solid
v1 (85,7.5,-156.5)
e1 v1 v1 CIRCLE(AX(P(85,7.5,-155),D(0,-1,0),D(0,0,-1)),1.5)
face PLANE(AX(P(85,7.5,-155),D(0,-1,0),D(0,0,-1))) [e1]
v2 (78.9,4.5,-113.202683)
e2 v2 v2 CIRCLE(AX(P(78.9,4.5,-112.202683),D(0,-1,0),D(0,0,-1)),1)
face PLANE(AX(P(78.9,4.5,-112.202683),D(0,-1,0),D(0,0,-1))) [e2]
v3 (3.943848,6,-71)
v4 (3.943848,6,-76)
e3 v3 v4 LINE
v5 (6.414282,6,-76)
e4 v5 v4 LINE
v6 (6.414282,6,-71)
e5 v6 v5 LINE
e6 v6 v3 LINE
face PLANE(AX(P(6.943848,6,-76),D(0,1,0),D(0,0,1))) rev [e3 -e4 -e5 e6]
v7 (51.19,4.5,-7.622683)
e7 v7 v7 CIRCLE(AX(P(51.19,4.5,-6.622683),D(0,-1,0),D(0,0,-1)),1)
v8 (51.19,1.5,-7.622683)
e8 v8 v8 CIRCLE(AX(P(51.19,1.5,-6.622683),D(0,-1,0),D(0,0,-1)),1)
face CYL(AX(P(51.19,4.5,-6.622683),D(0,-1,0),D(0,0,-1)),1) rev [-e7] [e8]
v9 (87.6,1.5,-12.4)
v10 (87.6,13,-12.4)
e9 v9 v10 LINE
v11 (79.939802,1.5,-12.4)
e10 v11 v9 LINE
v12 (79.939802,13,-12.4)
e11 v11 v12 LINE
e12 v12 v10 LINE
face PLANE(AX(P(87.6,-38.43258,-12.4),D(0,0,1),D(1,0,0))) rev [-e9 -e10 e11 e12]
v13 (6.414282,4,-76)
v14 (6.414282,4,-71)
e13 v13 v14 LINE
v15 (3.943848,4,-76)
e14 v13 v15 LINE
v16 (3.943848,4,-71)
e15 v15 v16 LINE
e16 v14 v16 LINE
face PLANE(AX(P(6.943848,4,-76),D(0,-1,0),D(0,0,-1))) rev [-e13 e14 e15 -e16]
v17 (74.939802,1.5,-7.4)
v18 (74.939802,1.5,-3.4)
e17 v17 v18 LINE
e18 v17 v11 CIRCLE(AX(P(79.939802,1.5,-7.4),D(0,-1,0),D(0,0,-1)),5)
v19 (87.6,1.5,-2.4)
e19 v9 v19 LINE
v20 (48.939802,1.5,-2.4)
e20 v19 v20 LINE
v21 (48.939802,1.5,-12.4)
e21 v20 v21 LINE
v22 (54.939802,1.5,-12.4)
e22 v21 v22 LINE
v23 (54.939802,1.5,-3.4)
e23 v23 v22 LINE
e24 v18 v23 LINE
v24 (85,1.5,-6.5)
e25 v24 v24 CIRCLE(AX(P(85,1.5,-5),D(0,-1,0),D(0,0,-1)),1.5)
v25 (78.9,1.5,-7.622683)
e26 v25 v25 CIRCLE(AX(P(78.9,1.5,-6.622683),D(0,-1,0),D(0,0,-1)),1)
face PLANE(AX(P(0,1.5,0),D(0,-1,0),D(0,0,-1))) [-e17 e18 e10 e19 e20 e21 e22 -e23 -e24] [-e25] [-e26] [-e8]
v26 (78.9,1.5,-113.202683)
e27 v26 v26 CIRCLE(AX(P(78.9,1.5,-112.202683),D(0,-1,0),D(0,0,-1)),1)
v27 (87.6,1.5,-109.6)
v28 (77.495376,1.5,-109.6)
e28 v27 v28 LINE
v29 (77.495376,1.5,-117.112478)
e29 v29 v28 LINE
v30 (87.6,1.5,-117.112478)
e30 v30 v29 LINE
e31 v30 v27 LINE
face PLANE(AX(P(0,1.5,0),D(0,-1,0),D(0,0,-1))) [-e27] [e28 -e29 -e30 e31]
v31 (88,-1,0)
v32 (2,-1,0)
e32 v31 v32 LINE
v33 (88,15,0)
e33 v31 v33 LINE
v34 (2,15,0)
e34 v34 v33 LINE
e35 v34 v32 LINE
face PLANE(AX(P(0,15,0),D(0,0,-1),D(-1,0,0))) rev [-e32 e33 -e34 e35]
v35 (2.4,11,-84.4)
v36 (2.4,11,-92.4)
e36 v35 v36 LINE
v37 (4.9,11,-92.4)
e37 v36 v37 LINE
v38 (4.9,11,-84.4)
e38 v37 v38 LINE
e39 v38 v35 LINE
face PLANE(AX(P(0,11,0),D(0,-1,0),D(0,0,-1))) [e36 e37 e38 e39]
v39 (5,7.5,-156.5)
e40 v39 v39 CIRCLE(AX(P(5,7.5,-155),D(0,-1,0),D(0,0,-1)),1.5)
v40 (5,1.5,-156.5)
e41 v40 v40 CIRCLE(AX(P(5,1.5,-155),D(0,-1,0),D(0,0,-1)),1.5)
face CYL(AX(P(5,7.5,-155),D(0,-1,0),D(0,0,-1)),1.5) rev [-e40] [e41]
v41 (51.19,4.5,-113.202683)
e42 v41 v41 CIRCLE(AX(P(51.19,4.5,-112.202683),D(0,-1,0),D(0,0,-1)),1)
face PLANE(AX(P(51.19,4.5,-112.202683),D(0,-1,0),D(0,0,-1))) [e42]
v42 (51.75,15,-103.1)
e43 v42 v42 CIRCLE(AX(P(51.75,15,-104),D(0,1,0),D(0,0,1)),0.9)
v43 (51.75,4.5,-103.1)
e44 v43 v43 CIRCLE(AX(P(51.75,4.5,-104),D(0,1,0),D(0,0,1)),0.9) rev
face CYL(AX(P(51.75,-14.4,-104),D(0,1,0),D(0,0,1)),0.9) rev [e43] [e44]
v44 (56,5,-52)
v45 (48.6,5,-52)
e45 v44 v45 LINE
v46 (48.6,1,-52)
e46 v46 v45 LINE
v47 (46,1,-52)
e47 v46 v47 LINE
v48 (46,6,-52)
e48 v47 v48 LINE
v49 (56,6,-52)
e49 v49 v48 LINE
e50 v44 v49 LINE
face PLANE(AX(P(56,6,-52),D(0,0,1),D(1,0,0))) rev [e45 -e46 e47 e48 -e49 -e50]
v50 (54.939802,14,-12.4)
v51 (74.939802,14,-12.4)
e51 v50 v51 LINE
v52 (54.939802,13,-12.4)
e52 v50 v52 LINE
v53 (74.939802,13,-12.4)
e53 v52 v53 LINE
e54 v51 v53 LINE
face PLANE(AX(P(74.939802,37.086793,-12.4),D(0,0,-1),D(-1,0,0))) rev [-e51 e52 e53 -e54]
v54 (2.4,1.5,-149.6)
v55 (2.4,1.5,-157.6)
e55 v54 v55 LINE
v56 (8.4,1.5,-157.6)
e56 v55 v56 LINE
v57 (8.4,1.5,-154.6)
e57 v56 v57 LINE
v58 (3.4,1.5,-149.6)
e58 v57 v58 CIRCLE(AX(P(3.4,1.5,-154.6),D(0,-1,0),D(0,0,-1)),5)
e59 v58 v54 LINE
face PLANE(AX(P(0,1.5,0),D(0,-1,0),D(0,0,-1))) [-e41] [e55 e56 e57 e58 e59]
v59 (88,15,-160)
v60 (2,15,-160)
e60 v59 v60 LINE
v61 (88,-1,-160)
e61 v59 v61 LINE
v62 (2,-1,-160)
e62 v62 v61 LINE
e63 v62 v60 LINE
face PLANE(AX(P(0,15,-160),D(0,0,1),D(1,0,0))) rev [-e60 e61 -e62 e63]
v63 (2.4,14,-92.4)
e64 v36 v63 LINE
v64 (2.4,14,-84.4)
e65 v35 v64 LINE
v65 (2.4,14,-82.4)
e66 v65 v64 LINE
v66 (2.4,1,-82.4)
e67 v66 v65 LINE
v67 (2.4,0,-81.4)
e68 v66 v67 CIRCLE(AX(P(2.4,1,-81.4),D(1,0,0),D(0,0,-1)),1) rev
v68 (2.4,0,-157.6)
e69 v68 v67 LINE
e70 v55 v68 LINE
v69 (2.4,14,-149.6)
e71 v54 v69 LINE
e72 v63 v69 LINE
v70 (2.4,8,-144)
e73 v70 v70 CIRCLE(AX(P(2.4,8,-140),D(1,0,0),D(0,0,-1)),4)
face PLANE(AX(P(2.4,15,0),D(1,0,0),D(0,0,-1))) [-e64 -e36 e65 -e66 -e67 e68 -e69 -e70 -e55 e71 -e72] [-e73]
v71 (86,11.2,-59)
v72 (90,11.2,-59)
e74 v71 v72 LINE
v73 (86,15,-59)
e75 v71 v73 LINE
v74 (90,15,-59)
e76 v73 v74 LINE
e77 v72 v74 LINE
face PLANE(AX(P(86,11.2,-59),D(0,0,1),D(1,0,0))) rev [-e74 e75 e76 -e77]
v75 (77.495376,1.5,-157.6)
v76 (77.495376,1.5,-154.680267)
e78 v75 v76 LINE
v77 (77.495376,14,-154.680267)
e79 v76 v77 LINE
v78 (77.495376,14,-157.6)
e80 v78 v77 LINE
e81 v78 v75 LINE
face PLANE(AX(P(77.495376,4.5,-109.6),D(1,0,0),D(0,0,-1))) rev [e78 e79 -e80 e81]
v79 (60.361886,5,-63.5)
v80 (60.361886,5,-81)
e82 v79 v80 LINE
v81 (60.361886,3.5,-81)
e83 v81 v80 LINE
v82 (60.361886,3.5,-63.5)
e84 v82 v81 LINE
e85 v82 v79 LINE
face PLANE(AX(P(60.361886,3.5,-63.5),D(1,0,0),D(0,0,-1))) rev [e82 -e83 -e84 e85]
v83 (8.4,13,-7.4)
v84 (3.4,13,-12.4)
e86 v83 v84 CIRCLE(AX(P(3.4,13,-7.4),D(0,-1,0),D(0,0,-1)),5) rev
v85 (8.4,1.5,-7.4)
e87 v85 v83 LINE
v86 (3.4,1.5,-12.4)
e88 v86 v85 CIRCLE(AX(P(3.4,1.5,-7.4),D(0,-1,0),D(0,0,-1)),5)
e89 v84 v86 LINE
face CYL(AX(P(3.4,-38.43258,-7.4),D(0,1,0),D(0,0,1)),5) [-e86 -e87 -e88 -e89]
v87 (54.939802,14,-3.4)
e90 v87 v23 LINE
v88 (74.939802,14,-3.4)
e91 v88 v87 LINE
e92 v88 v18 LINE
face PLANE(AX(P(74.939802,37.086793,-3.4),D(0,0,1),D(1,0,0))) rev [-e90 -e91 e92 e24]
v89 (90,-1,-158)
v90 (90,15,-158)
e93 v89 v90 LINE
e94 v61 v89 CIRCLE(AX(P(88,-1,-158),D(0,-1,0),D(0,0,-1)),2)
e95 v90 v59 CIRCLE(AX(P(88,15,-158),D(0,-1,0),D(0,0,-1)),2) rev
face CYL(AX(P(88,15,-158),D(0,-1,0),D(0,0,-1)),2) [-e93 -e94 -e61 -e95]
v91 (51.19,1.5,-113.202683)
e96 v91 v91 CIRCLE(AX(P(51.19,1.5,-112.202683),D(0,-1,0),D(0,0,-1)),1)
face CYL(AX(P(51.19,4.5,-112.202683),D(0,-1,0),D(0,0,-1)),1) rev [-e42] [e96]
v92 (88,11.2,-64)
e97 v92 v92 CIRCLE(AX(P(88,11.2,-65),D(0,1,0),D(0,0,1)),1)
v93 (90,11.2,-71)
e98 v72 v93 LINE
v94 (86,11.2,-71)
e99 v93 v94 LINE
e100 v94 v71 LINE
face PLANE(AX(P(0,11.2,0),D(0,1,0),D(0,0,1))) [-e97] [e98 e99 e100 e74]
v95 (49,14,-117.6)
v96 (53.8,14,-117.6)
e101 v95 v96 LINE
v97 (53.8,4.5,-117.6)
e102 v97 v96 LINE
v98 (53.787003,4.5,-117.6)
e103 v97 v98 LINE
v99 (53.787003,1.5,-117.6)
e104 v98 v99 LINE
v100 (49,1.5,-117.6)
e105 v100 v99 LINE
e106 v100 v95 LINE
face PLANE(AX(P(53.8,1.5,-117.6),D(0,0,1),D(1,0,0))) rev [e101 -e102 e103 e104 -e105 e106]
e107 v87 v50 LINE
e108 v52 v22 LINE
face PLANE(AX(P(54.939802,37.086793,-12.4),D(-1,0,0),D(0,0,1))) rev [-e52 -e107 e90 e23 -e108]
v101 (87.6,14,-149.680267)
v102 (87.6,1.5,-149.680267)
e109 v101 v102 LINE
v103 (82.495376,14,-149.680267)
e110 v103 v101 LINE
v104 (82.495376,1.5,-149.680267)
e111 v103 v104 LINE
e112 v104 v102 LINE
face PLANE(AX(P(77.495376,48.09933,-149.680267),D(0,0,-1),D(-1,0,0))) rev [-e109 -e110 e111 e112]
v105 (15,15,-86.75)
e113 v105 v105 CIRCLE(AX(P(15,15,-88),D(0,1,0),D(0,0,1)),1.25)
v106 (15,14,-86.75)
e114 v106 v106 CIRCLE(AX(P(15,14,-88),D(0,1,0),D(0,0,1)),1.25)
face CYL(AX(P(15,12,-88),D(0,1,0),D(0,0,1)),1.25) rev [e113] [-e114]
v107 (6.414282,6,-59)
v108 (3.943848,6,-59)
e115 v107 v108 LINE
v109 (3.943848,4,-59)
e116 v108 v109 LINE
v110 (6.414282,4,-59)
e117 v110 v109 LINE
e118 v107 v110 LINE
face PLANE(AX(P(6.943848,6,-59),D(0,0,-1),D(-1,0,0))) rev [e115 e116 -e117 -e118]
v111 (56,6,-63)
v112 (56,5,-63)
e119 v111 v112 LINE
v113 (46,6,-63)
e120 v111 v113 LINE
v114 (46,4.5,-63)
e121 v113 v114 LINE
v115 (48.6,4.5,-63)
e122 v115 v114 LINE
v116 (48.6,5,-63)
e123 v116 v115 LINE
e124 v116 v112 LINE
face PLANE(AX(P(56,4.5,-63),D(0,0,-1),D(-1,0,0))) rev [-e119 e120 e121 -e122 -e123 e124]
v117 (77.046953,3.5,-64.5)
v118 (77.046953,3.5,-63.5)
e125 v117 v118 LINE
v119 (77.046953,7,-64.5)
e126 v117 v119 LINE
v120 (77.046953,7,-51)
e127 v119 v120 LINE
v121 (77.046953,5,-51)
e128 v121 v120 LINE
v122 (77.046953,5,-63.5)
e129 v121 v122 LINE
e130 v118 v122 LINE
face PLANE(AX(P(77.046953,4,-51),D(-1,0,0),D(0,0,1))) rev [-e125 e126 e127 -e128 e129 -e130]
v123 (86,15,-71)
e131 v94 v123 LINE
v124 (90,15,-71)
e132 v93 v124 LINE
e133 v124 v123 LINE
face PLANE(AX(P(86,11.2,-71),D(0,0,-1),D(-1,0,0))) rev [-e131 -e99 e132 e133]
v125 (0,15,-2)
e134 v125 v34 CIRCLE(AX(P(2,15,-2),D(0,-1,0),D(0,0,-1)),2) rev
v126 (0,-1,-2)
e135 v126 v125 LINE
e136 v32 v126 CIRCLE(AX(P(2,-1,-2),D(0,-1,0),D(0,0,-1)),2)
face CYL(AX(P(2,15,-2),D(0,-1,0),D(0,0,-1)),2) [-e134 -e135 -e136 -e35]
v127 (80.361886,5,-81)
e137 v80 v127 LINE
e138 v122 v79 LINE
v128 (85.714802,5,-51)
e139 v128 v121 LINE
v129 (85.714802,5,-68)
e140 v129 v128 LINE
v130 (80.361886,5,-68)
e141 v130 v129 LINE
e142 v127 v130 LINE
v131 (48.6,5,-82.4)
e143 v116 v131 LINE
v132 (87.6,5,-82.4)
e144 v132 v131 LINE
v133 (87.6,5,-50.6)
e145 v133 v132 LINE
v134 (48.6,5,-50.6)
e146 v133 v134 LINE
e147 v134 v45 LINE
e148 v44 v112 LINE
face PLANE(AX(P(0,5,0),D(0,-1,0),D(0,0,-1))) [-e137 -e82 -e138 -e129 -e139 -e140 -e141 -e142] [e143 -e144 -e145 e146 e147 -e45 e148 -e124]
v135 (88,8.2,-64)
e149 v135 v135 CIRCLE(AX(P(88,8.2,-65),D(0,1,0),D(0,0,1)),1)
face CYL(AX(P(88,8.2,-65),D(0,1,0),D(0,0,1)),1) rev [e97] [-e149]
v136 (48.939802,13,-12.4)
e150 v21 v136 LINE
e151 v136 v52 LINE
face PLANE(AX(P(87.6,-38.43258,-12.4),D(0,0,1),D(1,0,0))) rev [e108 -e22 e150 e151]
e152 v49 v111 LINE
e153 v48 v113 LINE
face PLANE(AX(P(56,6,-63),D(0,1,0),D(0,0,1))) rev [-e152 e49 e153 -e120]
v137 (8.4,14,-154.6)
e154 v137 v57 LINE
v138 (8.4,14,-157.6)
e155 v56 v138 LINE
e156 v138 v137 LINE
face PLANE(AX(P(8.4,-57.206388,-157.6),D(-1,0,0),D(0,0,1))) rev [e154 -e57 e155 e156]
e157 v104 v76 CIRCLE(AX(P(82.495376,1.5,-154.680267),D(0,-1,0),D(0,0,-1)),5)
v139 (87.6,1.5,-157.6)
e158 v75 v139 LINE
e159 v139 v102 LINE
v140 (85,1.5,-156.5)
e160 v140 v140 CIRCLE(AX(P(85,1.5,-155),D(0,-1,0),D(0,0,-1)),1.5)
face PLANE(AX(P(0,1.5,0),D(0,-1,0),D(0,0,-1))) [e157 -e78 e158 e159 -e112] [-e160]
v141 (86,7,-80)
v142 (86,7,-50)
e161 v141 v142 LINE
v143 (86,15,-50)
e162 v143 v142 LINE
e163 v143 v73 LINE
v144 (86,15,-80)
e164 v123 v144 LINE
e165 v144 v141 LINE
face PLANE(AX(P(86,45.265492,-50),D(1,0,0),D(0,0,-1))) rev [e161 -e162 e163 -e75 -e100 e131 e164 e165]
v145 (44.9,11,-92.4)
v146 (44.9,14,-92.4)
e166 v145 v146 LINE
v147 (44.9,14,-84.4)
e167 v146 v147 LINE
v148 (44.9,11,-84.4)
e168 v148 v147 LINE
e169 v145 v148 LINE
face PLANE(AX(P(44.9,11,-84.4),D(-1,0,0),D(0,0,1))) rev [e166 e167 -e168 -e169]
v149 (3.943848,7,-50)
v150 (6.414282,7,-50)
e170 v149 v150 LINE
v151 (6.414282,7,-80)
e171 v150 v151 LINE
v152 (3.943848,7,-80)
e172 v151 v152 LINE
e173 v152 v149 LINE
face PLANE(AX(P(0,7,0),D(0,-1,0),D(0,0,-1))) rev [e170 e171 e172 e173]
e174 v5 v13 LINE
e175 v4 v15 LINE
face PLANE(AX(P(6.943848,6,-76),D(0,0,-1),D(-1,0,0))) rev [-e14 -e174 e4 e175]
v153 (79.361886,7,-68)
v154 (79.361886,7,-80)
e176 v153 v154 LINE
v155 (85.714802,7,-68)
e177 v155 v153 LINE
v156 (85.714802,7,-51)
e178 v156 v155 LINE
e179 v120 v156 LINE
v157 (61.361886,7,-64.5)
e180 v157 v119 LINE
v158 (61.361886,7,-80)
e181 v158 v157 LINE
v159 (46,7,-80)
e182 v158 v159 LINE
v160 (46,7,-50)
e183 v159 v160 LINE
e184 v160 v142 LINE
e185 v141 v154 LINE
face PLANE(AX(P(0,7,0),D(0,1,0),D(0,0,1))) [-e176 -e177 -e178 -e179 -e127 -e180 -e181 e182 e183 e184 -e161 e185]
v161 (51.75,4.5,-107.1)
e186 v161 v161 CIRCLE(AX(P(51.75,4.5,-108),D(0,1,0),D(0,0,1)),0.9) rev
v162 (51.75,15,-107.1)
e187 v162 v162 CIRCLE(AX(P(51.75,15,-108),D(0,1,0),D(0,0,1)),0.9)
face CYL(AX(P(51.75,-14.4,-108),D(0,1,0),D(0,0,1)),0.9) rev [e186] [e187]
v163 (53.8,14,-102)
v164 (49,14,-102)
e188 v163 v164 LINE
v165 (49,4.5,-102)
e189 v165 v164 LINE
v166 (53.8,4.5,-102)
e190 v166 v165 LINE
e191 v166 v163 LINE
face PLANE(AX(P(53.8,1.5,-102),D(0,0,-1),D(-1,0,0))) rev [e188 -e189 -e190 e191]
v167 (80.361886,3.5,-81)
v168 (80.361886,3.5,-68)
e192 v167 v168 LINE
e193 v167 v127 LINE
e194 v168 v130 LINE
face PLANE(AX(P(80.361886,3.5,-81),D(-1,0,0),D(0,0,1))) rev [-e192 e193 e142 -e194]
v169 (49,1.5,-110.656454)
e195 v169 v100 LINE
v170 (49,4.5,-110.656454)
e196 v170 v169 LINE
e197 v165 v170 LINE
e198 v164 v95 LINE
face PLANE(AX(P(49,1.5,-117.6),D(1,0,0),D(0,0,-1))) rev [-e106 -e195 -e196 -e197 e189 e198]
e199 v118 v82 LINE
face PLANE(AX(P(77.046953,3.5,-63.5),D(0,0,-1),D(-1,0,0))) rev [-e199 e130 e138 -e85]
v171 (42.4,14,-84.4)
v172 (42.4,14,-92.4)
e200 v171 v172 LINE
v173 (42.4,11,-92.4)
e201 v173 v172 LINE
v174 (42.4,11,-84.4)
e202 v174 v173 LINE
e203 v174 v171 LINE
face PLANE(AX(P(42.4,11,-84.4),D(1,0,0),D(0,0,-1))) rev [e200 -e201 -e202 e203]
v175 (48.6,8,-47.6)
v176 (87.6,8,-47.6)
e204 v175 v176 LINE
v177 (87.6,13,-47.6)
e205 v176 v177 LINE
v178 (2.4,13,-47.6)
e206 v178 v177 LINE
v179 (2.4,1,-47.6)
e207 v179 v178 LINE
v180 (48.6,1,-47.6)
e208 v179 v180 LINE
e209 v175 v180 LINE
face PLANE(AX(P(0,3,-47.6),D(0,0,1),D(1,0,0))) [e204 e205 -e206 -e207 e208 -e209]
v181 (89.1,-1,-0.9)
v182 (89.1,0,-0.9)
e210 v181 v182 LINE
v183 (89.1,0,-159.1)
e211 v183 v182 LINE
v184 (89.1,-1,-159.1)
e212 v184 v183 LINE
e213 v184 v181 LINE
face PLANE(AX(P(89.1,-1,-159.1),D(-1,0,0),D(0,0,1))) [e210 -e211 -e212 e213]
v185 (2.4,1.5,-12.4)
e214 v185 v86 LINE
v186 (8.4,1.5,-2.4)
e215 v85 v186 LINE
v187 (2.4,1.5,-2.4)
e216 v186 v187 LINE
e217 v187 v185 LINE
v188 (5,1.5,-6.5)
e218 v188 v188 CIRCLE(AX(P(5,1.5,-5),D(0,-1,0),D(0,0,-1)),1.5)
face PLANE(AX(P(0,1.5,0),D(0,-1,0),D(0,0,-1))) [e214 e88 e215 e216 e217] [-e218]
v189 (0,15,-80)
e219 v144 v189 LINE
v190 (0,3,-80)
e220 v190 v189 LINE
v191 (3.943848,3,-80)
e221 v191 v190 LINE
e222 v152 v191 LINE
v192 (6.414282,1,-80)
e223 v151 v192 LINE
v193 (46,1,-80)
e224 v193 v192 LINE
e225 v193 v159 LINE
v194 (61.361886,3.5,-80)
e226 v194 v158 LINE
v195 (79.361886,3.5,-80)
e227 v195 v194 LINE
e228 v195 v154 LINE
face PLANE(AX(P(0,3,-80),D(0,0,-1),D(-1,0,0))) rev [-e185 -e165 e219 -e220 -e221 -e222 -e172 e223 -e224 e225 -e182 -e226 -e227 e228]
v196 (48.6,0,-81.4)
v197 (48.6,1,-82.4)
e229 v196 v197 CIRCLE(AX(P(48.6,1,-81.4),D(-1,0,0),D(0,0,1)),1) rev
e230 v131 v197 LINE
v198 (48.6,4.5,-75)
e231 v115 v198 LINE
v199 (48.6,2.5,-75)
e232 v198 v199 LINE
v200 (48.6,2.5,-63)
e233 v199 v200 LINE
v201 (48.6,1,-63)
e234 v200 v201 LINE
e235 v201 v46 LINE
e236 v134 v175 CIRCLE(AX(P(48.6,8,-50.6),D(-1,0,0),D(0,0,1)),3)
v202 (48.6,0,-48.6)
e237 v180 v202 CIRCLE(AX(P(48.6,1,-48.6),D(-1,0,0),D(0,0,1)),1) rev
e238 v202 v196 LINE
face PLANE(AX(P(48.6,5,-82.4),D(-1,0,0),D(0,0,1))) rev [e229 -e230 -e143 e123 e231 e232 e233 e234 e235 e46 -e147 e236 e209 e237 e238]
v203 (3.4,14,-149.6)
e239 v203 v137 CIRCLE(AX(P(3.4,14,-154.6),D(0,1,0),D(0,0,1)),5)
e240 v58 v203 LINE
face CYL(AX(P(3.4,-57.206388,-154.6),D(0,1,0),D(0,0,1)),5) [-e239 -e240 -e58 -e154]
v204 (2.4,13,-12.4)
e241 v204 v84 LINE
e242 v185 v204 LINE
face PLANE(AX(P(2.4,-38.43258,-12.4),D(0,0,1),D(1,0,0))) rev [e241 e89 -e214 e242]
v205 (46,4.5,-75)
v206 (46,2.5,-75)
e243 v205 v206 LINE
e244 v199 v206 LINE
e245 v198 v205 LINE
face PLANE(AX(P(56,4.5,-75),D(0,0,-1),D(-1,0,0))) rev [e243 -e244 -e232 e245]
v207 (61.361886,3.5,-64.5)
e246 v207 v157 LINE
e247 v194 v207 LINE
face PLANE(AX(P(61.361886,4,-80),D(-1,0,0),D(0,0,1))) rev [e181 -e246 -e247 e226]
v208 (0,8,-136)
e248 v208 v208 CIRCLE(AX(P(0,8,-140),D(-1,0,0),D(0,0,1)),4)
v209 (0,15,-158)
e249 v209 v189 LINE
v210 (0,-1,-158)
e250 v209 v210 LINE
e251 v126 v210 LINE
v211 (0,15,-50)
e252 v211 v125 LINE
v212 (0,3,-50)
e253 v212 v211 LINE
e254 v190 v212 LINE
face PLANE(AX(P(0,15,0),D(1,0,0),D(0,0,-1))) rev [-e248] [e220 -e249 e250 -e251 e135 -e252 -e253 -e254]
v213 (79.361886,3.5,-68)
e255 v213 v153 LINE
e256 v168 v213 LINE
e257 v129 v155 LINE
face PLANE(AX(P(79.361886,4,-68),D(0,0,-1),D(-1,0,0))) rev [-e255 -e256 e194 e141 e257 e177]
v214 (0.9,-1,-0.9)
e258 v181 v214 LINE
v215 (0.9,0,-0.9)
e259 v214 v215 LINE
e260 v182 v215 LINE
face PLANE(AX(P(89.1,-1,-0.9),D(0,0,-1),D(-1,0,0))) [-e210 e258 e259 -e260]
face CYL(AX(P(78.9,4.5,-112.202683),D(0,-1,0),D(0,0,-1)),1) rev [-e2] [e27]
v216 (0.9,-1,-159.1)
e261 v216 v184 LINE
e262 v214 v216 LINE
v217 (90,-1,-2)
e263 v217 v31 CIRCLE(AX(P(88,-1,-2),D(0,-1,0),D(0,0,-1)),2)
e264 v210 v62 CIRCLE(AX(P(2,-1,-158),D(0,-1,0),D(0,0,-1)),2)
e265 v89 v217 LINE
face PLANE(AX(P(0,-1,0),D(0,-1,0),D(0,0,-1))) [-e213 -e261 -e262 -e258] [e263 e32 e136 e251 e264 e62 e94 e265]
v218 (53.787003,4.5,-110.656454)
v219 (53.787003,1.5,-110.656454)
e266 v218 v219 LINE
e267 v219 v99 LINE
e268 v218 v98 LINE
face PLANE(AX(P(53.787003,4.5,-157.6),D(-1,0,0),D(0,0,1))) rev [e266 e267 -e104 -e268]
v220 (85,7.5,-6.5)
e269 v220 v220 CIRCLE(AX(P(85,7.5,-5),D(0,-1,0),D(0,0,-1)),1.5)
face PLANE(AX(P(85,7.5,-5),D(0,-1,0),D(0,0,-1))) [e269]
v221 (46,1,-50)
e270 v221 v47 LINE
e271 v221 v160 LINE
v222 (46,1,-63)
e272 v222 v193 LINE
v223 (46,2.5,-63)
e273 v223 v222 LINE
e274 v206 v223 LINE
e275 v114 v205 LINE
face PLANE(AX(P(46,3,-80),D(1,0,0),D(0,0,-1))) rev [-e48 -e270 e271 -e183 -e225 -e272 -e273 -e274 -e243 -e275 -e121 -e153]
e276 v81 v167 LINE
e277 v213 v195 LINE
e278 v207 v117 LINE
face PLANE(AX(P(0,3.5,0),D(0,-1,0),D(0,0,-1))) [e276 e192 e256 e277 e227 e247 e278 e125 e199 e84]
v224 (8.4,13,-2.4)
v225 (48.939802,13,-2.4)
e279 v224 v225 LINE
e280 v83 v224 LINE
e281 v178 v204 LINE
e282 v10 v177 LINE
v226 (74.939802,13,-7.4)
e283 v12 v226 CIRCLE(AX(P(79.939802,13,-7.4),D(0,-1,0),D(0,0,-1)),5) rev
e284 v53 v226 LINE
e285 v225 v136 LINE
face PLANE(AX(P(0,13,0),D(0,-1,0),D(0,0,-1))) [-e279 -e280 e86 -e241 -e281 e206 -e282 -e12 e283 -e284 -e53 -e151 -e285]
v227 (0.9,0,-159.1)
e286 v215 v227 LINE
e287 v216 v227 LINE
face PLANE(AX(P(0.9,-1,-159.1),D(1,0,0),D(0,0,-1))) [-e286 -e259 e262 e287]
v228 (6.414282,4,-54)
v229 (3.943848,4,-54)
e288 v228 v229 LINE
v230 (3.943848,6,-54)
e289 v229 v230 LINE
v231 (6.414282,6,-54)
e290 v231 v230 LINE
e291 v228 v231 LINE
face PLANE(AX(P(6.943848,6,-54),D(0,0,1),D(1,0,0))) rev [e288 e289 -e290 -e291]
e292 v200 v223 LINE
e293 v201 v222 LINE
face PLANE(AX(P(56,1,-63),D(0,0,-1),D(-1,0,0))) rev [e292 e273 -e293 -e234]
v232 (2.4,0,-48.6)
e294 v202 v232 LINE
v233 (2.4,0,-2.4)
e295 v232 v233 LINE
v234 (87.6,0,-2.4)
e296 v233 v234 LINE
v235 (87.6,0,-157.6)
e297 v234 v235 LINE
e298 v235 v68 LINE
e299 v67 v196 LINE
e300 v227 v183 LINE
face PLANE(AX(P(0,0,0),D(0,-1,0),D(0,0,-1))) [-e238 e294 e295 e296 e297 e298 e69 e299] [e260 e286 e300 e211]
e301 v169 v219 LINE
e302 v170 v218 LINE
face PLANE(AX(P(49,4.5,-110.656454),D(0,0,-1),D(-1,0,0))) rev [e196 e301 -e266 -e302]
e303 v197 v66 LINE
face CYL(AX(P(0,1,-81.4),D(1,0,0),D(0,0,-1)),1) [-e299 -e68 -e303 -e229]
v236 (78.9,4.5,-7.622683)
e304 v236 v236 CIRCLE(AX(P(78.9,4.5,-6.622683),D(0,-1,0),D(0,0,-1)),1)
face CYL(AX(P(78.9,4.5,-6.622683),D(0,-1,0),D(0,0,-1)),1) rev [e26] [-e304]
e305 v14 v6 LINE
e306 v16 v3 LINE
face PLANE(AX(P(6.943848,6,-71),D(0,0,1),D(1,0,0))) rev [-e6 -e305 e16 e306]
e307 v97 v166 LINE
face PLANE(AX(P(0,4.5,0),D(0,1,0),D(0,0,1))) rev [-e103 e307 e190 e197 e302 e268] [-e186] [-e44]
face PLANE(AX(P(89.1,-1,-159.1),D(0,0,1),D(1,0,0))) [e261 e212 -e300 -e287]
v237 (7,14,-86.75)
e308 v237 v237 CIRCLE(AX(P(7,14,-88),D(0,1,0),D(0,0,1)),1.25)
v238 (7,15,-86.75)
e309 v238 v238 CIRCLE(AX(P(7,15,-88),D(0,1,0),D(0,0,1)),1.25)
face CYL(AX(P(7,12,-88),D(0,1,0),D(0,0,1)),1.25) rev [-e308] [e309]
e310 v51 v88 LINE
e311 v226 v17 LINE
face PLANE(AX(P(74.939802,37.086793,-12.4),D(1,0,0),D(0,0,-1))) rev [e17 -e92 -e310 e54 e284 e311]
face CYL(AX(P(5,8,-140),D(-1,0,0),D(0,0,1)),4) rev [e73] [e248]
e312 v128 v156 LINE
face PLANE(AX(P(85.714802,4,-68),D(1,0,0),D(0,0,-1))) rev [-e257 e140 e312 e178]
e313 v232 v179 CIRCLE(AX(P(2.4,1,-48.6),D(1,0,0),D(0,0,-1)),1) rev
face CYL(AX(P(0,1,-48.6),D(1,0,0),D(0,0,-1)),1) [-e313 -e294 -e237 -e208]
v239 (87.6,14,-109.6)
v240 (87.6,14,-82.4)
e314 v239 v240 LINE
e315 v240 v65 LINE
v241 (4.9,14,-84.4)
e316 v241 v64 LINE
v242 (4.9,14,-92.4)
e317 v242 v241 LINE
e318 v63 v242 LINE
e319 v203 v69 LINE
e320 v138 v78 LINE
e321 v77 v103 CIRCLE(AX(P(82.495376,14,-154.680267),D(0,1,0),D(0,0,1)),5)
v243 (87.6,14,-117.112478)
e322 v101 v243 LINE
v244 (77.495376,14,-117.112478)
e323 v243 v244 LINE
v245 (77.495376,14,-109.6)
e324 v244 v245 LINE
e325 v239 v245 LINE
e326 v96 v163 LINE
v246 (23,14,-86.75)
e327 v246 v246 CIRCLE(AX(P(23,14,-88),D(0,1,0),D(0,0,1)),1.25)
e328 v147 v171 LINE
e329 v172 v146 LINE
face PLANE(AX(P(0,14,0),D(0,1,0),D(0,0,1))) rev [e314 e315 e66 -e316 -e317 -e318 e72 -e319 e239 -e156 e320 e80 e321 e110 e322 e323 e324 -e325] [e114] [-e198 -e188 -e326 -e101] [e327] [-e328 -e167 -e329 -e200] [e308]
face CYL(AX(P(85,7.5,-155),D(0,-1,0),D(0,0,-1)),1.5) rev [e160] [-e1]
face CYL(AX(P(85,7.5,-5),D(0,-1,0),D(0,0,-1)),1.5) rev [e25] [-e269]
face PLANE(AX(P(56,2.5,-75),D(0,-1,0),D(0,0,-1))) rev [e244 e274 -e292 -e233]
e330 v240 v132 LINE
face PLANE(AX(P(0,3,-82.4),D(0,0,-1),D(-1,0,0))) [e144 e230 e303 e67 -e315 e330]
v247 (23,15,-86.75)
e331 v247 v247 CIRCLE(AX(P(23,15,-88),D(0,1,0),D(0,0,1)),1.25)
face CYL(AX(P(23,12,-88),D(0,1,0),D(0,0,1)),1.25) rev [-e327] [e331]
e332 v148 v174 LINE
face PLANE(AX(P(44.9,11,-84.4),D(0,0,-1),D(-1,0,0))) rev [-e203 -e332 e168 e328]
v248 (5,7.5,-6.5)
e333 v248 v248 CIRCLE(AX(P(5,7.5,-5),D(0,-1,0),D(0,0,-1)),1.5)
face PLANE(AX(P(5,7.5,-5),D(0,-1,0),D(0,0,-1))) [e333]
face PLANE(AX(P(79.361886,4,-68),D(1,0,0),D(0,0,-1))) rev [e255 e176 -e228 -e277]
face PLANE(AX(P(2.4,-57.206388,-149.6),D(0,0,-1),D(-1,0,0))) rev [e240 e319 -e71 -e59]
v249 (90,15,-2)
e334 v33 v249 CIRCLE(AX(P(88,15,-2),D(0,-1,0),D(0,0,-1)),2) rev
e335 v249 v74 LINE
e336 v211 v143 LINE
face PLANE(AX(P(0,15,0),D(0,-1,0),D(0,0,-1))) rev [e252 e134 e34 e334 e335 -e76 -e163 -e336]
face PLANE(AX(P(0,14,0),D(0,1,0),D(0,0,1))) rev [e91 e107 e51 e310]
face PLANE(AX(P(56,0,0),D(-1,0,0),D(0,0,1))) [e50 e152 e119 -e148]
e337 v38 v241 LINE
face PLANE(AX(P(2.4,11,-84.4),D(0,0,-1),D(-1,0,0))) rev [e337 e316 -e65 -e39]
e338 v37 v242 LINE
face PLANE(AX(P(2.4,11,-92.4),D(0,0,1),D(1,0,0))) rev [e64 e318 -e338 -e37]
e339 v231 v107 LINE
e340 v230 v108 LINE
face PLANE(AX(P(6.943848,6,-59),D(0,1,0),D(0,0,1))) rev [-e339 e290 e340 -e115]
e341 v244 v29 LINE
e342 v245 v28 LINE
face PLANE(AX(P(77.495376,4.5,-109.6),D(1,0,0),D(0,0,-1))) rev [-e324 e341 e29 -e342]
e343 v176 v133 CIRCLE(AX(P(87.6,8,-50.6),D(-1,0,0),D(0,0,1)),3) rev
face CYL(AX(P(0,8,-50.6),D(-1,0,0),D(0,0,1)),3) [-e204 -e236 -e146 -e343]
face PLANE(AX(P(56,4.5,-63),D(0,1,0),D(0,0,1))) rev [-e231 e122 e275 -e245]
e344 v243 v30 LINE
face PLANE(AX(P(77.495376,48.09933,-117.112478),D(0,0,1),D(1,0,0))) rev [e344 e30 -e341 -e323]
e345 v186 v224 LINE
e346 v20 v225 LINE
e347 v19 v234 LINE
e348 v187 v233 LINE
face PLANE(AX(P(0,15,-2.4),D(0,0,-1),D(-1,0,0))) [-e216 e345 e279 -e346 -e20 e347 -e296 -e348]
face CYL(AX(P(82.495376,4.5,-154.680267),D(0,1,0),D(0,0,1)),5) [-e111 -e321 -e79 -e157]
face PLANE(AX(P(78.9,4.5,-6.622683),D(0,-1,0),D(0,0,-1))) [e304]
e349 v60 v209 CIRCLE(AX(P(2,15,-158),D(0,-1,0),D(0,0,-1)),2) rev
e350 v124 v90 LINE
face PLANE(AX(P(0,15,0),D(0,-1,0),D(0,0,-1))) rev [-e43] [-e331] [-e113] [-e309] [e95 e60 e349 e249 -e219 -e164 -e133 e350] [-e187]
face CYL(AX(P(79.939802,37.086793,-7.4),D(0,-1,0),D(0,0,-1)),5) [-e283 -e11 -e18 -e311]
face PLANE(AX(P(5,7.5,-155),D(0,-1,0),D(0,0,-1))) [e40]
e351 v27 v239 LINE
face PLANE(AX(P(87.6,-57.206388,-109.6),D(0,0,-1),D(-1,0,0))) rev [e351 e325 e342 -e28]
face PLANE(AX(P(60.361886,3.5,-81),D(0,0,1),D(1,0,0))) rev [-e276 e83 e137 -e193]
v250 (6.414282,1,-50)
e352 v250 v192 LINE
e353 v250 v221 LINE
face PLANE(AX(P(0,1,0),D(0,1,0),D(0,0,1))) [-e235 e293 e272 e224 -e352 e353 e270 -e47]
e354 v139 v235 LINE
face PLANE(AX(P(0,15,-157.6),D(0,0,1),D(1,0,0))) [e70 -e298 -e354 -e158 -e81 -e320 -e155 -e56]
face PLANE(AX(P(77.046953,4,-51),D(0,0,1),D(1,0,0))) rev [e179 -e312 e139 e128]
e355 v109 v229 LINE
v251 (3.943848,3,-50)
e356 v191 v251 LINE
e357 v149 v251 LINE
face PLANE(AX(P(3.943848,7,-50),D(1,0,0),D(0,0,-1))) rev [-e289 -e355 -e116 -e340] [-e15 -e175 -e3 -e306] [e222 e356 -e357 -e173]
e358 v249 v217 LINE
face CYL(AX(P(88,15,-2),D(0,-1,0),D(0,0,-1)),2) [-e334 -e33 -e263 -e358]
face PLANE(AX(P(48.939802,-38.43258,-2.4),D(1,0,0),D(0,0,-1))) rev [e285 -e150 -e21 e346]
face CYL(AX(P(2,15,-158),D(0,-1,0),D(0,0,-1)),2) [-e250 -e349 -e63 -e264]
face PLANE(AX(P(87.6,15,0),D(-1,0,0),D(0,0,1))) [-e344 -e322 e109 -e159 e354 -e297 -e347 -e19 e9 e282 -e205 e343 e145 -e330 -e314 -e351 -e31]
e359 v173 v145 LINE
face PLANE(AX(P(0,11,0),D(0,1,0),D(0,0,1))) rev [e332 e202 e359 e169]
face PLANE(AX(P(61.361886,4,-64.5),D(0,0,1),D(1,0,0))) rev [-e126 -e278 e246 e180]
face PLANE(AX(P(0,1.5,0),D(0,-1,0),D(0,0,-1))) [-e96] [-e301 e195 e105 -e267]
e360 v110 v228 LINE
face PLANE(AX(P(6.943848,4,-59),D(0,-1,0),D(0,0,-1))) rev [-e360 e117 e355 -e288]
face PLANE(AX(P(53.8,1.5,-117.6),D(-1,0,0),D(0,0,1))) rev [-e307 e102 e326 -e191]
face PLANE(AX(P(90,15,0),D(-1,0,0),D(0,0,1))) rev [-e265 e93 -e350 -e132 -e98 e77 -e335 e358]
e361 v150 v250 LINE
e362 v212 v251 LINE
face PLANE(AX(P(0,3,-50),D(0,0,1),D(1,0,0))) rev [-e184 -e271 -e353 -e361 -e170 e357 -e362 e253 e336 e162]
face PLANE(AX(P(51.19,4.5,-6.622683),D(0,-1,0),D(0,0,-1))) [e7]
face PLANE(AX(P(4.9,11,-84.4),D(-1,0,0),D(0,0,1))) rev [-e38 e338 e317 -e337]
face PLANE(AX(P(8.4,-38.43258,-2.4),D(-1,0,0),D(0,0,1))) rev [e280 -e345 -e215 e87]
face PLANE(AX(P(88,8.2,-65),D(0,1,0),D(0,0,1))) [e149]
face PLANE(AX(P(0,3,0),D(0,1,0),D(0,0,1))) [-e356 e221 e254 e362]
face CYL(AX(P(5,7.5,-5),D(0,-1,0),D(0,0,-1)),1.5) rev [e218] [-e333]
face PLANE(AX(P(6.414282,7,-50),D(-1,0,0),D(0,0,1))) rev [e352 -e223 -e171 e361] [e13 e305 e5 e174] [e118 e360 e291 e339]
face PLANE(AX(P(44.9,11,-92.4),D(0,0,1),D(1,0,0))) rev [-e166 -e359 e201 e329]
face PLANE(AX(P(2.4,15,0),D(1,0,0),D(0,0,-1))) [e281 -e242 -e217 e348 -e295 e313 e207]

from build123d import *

# Parameters (mm, degrees)
SKETCH1_W            = 90
SKETCH1_H            = 160
BOSS_EXTRUDE1_DEPTH  = 15
SKETCH2_W            = 46
SKETCH2_H            = 30
CUT_EXTRUDE1_DEPTH   = 12
SKETCH3_W            = 44
SKETCH3_H            = 30
CUT_EXTRUDE2_DEPTH   = 8
SHELL1_START         = -47.6
SHELL1_OUTLINE_W     = 85.2
SHELL1_OUTLINE_H     = 13
SHELL1_DEPTH         = 45.2
SHELL1_START_2       = -157.6
SHELL1_2_OUTLINE_W   = 85.2
SHELL1_2_OUTLINE_H   = 5
SHELL1_2_DEPTH       = 75.2
SKETCH7_W            = 39
SKETCH7_H            = 34.8
CUT_EXTRUDE6_DEPTH   = 5
SKETCH11_W           = 42.056152249
SKETCH11_H           = 30
CUT_EXTRUDE9_DEPTH   = 2
CUT_EXTRUDE7_DEPTH   = 10
CUT_EXTRUDE10_DEPTH  = 3
SKETCH14_W           = 90
SKETCH14_H           = 160
SKETCH14_W_2         = 88.2
SKETCH14_H_2         = 158.2
BOSS_EXTRUDE2_DEPTH  = 1
SKETCH22_W           = 4
SKETCH22_H           = 30
BOSS_EXTRUDE6_DEPTH  = 8
SKETCH26_W           = 4
SKETCH26_H           = 12
CUT_EXTRUDE20_DEPTH  = 3.8
SKETCH27_R           = 1
CUT_EXTRUDE21_DEPTH  = 3
BOSS_EXTRUDE9_DEPTH  = 1.5
SKETCH40_R           = 4
CUT_EXTRUDE24_DEPTH  = 5
FILLET1_R            = 3
SKETCH44_W           = 85.2
SKETCH44_H           = 75.2
CUT_EXTRUDE25_DEPTH  = 9
SKETCH46_W           = 4.8
SKETCH46_H           = 15.6
BOSS_EXTRUDE15_DEPTH = 12.5
SKETCH6_R            = 0.9
CUT_EXTRUDE26_DEPTH  = 29.4
SKETCH47_W           = 33.8
SKETCH47_H           = 48
SKETCH47_W_2         = 6
SKETCH47_H_2         = 8
BOSS_EXTRUDE16_DEPTH = 12.5
SKETCH49_W           = 38.660197992
SKETCH49_H           = 10
SKETCH49_W_2         = 6
BOSS_EXTRUDE17_DEPTH = 11.5
CUT_EXTRUDE28_REACH  = 186.071
SKETCH50_W           = 22
SKETCH50_H           = 7
SKETCH50_W_2         = 20
SKETCH50_H_2         = 9
FILLET4_R            = 2
SKETCH51_R           = 1.5
CUT_EXTRUDE29_DEPTH  = 6
CUT_EXTRUDE30_DEPTH  = 3
SKETCH52_R           = 1
CUT_EXTRUDE31_DEPTH  = 3
SKETCH54_W           = 2.470433815
SKETCH54_H           = 30
BOSS_EXTRUDE18_DEPTH = 6
SKETCH55_W           = 5
SKETCH55_H           = 2
CUT_EXTRUDE32_DEPTH  = 3
FILLET5_R            = 1
SKETCH56_R           = 1.25
CUT_EXTRUDE33_DEPTH  = 3
SKETCH57_W           = 2.5
SKETCH57_H           = 8
BOSS_EXTRUDE19_DEPTH = 3
CUT_EXTRUDE36_REACH  = 186.071
SKETCH59_W           = 10.104623882
SKETCH59_H           = 32.567789254
SKETCH60_W           = 23.695376118
SKETCH60_H           = 48.017621291
CUT_EXTRUDE37_DEPTH  = 9.5
FILLET3_R            = 5


# Read off the part's stored shape, not the designer's step: Shell1
with BuildPart() as part:
    # Sketch1 → Boss-Extrude1 (new body)
    with BuildSketch(Plane(origin=(0, 0, 0), x_dir=(1, 0, 0), z_dir=(0, 1, 0))):
        with Locations((45, 80)):
            Rectangle(SKETCH1_W, SKETCH1_H)
    extrude(amount=BOSS_EXTRUDE1_DEPTH)

    # Sketch2 → Cut-Extrude1 (cut)
    with BuildSketch(Plane(origin=(0, 15, 0), x_dir=(1, 0, 0), z_dir=(0, 1, 0))):
        with Locations((23, 65)):
            Rectangle(SKETCH2_W, SKETCH2_H)
    extrude(amount=-CUT_EXTRUDE1_DEPTH, mode=Mode.SUBTRACT)

    # Sketch3 → Cut-Extrude2 (cut)
    with BuildSketch(Plane(origin=(0, 15, 0), x_dir=(1, 0, 0), z_dir=(0, 1, 0))):
        with Locations((68, 65)):
            Rectangle(SKETCH3_W, SKETCH3_H)
    extrude(amount=-CUT_EXTRUDE2_DEPTH, mode=Mode.SUBTRACT)

    # Shell1 outline → Shell1 (cut)
    with BuildSketch(Plane.XY.offset(SHELL1_START)):
        with Locations((45, 6.5)):
            Rectangle(SHELL1_OUTLINE_W, SHELL1_OUTLINE_H)
    extrude(amount=SHELL1_DEPTH, mode=Mode.SUBTRACT)

    # Shell1 2 outline → Shell1 2 (cut)
    with BuildSketch(Plane.XY.offset(SHELL1_START_2)):
        with Locations((45, 2.5)):
            Rectangle(SHELL1_2_OUTLINE_W, SHELL1_2_OUTLINE_H)
    extrude(amount=SHELL1_2_DEPTH, mode=Mode.SUBTRACT)

    # Sketch7 → Cut-Extrude6 (cut)
    with BuildSketch(Plane.XZ):
        with Locations((68.1, -65)):
            Rectangle(SKETCH7_W, SKETCH7_H)
    extrude(amount=-CUT_EXTRUDE6_DEPTH, mode=Mode.SUBTRACT)

    # Sketch11 → Cut-Extrude9 (cut)
    with BuildSketch(Plane(origin=(0, 3, 0), x_dir=(1, 0, 0), z_dir=(0, 1, 0))):
        with Locations((24.971923875, 65)):
            Rectangle(SKETCH11_W, SKETCH11_H)
    extrude(amount=-CUT_EXTRUDE9_DEPTH, mode=Mode.SUBTRACT)

    # Sketch8 → Cut-Extrude7 (cut)
    with BuildSketch(Plane.ZY.offset(-46)):
        Polygon((-63, 1), (-63, 2.5), (-75, 2.5), (-75, 4.5), (-63, 4.5), (-63, 6), (-52, 6), (-52, 4.5), (-52, 1), align=None)
    extrude(amount=-CUT_EXTRUDE7_DEPTH, mode=Mode.SUBTRACT)

    # Sketch12 → Cut-Extrude10 (cut)
    with BuildSketch(Plane(origin=(0, 7, 0), x_dir=(1, 0, 0), z_dir=(0, 1, 0))):
        Polygon((79.361885724, 68), (79.361885724, 80), (61.361885724, 80), (61.361885724, 64.5), (77.04695331, 64.5), (77.04695331, 51), (85.714801791, 51), (85.714801791, 68), align=None)
    extrude(amount=-CUT_EXTRUDE10_DEPTH, mode=Mode.SUBTRACT)

    # Sketch14 → Boss-Extrude2 (add)
    with BuildSketch(Plane.XZ):
        with Locations((45, -80)):
            Rectangle(SKETCH14_W, SKETCH14_H)
        with Locations((45, -80)):
            Rectangle(SKETCH14_W_2, SKETCH14_H_2, mode=Mode.SUBTRACT)
    extrude(amount=BOSS_EXTRUDE2_DEPTH)

    # Sketch22 → Boss-Extrude6 (add)
    with BuildSketch(Plane(origin=(0, 7, 0), x_dir=(1, 0, 0), z_dir=(0, 1, 0))):
        with Locations((88, 65)):
            Rectangle(SKETCH22_W, SKETCH22_H)
    extrude(amount=BOSS_EXTRUDE6_DEPTH)

    # Sketch26 → Cut-Extrude20 (cut)
    with BuildSketch(Plane(origin=(0, 15, 0), x_dir=(1, 0, 0), z_dir=(0, 1, 0))):
        with Locations((88, 65)):
            Rectangle(SKETCH26_W, SKETCH26_H)
    extrude(amount=-CUT_EXTRUDE20_DEPTH, mode=Mode.SUBTRACT)

    # Sketch27 → Cut-Extrude21 (cut)
    with BuildSketch(Plane(origin=(0, 11.2, 0), x_dir=(1, 0, 0), z_dir=(0, 1, 0))):
        with Locations(Location((88, 65, 0), (0, 0, 270))):
            Circle(SKETCH27_R)
    extrude(amount=-CUT_EXTRUDE21_DEPTH, mode=Mode.SUBTRACT)

    # Sketch36 → Boss-Extrude9 (add)
    with BuildSketch(Plane.XZ.offset(-5)):
        Polygon((77.04695331, -63.5), (60.361885724, -63.5), (60.361885724, -81), (80.361885724, -81), (80.361885724, -68), (79.361885724, -68), (79.361885724, -80), (61.361885724, -80), (61.361885724, -64.5), (77.04695331, -64.5), align=None)
    extrude(amount=BOSS_EXTRUDE9_DEPTH)

    # Sketch40 → Cut-Extrude24 (cut)
    with BuildSketch(Plane.ZY):
        with Locations((-140, 8)):
            Circle(SKETCH40_R)
    extrude(amount=-CUT_EXTRUDE24_DEPTH, mode=Mode.SUBTRACT)

    # Fillet1
    fillet1_edges = [part.edges().sort_by_distance(p)[0] for p in [
        (68.1, 5, -47.6),
    ]]
    fillet(fillet1_edges, radius=FILLET1_R)

    # Sketch44 → Cut-Extrude25 (cut)
    with BuildSketch(Plane.XZ.offset(-5)):
        with Locations((45, -120)):
            Rectangle(SKETCH44_W, SKETCH44_H)
    extrude(amount=-CUT_EXTRUDE25_DEPTH, mode=Mode.SUBTRACT)

    # Sketch46 → Boss-Extrude15 (add)
    with BuildSketch(Plane.XZ.offset(-14)):
        with Locations((51.4, -109.8)):
            Rectangle(SKETCH46_W, SKETCH46_H)
    extrude(amount=BOSS_EXTRUDE15_DEPTH)

    # Sketch6 → Cut-Extrude26 (cut)
    with BuildSketch(Plane(origin=(0, 15, 0), x_dir=(1, 0, 0), z_dir=(0, 1, 0))):
        with Locations(Location((51.75, 108, 0), (0, 0, 270))):
            Circle(SKETCH6_R)
        with Locations(Location((51.75, 104, 0), (0, 0, 270))):
            Circle(SKETCH6_R)
    extrude(amount=-CUT_EXTRUDE26_DEPTH, mode=Mode.SUBTRACT)

    # Sketch47 → Boss-Extrude16 (add)
    with BuildSketch(Plane.XZ.offset(-14)):
        with Locations((70.7, -133.6)):
            Rectangle(SKETCH47_W, SKETCH47_H)
        with Locations((5.4, -153.6)):
            Rectangle(SKETCH47_W_2, SKETCH47_H_2)
    extrude(amount=BOSS_EXTRUDE16_DEPTH)

    # Sketch49 → Boss-Extrude17 (add)
    with BuildSketch(Plane.XZ.offset(-13)):
        with Locations((68.269901004, -7.4)):
            Rectangle(SKETCH49_W, SKETCH49_H)
        with Locations((5.4, -7.4)):
            Rectangle(SKETCH49_W_2, SKETCH49_H)
    extrude(amount=BOSS_EXTRUDE17_DEPTH)

    # Cut-Extrude28: up to this face of the body (flat: up to its plane)
    cut_extrude28_end = Plane(part.part.faces().sort_by_distance((36.360749588, 14, -115.08476112))[0])
    # Sketch50 → Cut-Extrude28 (cut, up to the picked face)
    with BuildSketch(Plane.XZ.offset(-1.5), mode=Mode.PRIVATE) as cut_extrude28_sk1:
        with Locations((64.8, -113.1)):
            Rectangle(SKETCH50_W, SKETCH50_H)
    cut_extrude28_tool1 = split(extrude(cut_extrude28_sk1.sketch, amount=-CUT_EXTRUDE28_REACH, mode=Mode.PRIVATE), bisect_by=cut_extrude28_end, keep=Keep.BOTH, mode=Mode.PRIVATE)
    # Sketch50 → Cut-Extrude28 (cut, up to the picked face)
    with BuildSketch(Plane.XZ.offset(-1.5), mode=Mode.PRIVATE) as cut_extrude28_sk2:
        with Locations((64.939802008, -7.9)):
            Rectangle(SKETCH50_W_2, SKETCH50_H_2)
    cut_extrude28_tool2 = split(extrude(cut_extrude28_sk2.sketch, amount=-CUT_EXTRUDE28_REACH, mode=Mode.PRIVATE), bisect_by=cut_extrude28_end, keep=Keep.BOTH, mode=Mode.PRIVATE)
    add(cut_extrude28_tool1.solids().sort_by(Axis((64.8, 1.5, -113.1), (0, 1, 0)))[0], mode=Mode.SUBTRACT)
    add(cut_extrude28_tool2.solids().sort_by(Axis((64.939802, 1.5, -7.9), (0, 1, 0)))[0], mode=Mode.SUBTRACT)

    # Fillet4
    fillet4_edges = [part.edges().sort_by_distance(p)[0] for p in [
        (0, 7, -160),
        (90, 7, -160),
        (90, 7, 0),
        (0, 7, 0),
    ]]
    fillet(fillet4_edges, radius=FILLET4_R)

    # Sketch51 → Cut-Extrude29 (cut)
    with BuildSketch(Plane.XZ.offset(-1.5)):
        with Locations(Location((85, -155, 0), (0, 0, 270))):
            Circle(SKETCH51_R)
        with Locations(Location((85, -5, 0), (0, 0, 270))):
            Circle(SKETCH51_R)
        with Locations(Location((5, -5, 0), (0, 0, 270))):
            Circle(SKETCH51_R)
        with Locations(Location((5, -155, 0), (0, 0, 270))):
            Circle(SKETCH51_R)
    extrude(amount=-CUT_EXTRUDE29_DEPTH, mode=Mode.SUBTRACT)

    # Sketch53 → Cut-Extrude30 (cut)
    with BuildSketch(Plane.XZ.offset(-1.5)):
        Polygon((75.8, -109.6), (77.495376118, -109.6), (77.495376118, -157.6), (53.787002796, -157.6), (53.787002796, -110.656453849), (49, -110.656453849), (49, -102), (53.8, -102), (53.8, -116.6), (75.8, -116.6), align=None)
    extrude(amount=-CUT_EXTRUDE30_DEPTH, mode=Mode.SUBTRACT)

    # Sketch52 → Cut-Extrude31 (cut)
    with BuildSketch(Plane.XZ.offset(-1.5)):
        with Locations(Location((78.9, -6.622682824, 0), (0, 0, 270))):
            Circle(SKETCH52_R)
        with Locations(Location((51.19, -6.622682824, 0), (0, 0, 270))):
            Circle(SKETCH52_R)
        with Locations(Location((78.9, -112.202682824, 0), (0, 0, 270))):
            Circle(SKETCH52_R)
        with Locations(Location((51.19, -112.202682824, 0), (0, 0, 270))):
            Circle(SKETCH52_R)
    extrude(amount=-CUT_EXTRUDE31_DEPTH, mode=Mode.SUBTRACT)

    # Sketch54 → Boss-Extrude18 (add)
    with BuildSketch(Plane(origin=(0, 1, 0), x_dir=(1, 0, 0), z_dir=(0, 1, 0))):
        with Locations((5.179064659, 65)):
            Rectangle(SKETCH54_W, SKETCH54_H)
    extrude(amount=BOSS_EXTRUDE18_DEPTH)

    # Sketch55 → Cut-Extrude32 (cut)
    with BuildSketch(Plane.ZY.offset(-3.943847751)):
        with Locations((-73.5, 5)):
            Rectangle(SKETCH55_W, SKETCH55_H)
        with Locations((-56.5, 5)):
            Rectangle(SKETCH55_W, SKETCH55_H)
    extrude(amount=-CUT_EXTRUDE32_DEPTH, mode=Mode.SUBTRACT)

    # Fillet5
    fillet5_edges = [part.edges().sort_by_distance(p)[0] for p in [
        (25.5, 0, -82.4),
        (25.5, 0, -47.6),
    ]]
    fillet(fillet5_edges, radius=FILLET5_R)

    # Sketch56 → Cut-Extrude33 (cut)
    with BuildSketch(Plane(origin=(0, 15, 0), x_dir=(1, 0, 0), z_dir=(0, 1, 0))):
        with Locations(Location((7, 88, 0), (0, 0, 270))):
            Circle(SKETCH56_R)
        with Locations(Location((15, 88, 0), (0, 0, 270))):
            Circle(SKETCH56_R)
        with Locations(Location((23, 88, 0), (0, 0, 270))):
            Circle(SKETCH56_R)
    extrude(amount=-CUT_EXTRUDE33_DEPTH, mode=Mode.SUBTRACT)

    # Sketch57 → Boss-Extrude19 (add)
    with BuildSketch(Plane.XZ.offset(-14)):
        with Locations((3.65, -88.4)):
            Rectangle(SKETCH57_W, SKETCH57_H)
        with Locations((43.65, -88.4)):
            Rectangle(SKETCH57_W, SKETCH57_H)
    extrude(amount=BOSS_EXTRUDE19_DEPTH)

    # Cut-Extrude36: up to this face of the body (flat: up to its plane)
    cut_extrude36_end = Plane(part.part.faces().sort_by_distance((37.453503344, 14, -115.328530292))[0])
    # Sketch59 → Cut-Extrude36 (cut, up to the picked face)
    with BuildSketch(Plane.XZ.offset(-1.5), mode=Mode.PRIVATE) as cut_extrude36_sk1:
        with Locations((82.547688059, -133.39637261)):
            Rectangle(SKETCH59_W, SKETCH59_H)
    cut_extrude36_tool1 = split(extrude(cut_extrude36_sk1.sketch, amount=-CUT_EXTRUDE36_REACH, mode=Mode.PRIVATE), bisect_by=cut_extrude36_end, keep=Keep.BOTH, mode=Mode.PRIVATE)
    add(cut_extrude36_tool1.solids().sort_by(Axis((82.547688, 1.5, -133.396373), (0, 1, 0)))[0], mode=Mode.SUBTRACT)

    # Sketch60 → Cut-Extrude37 (cut)
    with BuildSketch(Plane.XZ.offset(-4.5)):
        with Locations((65.647688059, -133.591189355)):
            Rectangle(SKETCH60_W, SKETCH60_H)
    extrude(amount=-CUT_EXTRUDE37_DEPTH, mode=Mode.SUBTRACT)

    # Fillet3
    fillet3_edges = [part.edges().sort_by_distance(p)[0] for p in [
        (8.4, 7.75, -149.6),
        (8.4, 7.25, -12.4),
        (74.939802008, 7.25, -12.4),
        (77.495376118, 7.75, -149.680267237),
    ]]
    fillet(fillet3_edges, radius=FILLET3_R)


solid = part.part
